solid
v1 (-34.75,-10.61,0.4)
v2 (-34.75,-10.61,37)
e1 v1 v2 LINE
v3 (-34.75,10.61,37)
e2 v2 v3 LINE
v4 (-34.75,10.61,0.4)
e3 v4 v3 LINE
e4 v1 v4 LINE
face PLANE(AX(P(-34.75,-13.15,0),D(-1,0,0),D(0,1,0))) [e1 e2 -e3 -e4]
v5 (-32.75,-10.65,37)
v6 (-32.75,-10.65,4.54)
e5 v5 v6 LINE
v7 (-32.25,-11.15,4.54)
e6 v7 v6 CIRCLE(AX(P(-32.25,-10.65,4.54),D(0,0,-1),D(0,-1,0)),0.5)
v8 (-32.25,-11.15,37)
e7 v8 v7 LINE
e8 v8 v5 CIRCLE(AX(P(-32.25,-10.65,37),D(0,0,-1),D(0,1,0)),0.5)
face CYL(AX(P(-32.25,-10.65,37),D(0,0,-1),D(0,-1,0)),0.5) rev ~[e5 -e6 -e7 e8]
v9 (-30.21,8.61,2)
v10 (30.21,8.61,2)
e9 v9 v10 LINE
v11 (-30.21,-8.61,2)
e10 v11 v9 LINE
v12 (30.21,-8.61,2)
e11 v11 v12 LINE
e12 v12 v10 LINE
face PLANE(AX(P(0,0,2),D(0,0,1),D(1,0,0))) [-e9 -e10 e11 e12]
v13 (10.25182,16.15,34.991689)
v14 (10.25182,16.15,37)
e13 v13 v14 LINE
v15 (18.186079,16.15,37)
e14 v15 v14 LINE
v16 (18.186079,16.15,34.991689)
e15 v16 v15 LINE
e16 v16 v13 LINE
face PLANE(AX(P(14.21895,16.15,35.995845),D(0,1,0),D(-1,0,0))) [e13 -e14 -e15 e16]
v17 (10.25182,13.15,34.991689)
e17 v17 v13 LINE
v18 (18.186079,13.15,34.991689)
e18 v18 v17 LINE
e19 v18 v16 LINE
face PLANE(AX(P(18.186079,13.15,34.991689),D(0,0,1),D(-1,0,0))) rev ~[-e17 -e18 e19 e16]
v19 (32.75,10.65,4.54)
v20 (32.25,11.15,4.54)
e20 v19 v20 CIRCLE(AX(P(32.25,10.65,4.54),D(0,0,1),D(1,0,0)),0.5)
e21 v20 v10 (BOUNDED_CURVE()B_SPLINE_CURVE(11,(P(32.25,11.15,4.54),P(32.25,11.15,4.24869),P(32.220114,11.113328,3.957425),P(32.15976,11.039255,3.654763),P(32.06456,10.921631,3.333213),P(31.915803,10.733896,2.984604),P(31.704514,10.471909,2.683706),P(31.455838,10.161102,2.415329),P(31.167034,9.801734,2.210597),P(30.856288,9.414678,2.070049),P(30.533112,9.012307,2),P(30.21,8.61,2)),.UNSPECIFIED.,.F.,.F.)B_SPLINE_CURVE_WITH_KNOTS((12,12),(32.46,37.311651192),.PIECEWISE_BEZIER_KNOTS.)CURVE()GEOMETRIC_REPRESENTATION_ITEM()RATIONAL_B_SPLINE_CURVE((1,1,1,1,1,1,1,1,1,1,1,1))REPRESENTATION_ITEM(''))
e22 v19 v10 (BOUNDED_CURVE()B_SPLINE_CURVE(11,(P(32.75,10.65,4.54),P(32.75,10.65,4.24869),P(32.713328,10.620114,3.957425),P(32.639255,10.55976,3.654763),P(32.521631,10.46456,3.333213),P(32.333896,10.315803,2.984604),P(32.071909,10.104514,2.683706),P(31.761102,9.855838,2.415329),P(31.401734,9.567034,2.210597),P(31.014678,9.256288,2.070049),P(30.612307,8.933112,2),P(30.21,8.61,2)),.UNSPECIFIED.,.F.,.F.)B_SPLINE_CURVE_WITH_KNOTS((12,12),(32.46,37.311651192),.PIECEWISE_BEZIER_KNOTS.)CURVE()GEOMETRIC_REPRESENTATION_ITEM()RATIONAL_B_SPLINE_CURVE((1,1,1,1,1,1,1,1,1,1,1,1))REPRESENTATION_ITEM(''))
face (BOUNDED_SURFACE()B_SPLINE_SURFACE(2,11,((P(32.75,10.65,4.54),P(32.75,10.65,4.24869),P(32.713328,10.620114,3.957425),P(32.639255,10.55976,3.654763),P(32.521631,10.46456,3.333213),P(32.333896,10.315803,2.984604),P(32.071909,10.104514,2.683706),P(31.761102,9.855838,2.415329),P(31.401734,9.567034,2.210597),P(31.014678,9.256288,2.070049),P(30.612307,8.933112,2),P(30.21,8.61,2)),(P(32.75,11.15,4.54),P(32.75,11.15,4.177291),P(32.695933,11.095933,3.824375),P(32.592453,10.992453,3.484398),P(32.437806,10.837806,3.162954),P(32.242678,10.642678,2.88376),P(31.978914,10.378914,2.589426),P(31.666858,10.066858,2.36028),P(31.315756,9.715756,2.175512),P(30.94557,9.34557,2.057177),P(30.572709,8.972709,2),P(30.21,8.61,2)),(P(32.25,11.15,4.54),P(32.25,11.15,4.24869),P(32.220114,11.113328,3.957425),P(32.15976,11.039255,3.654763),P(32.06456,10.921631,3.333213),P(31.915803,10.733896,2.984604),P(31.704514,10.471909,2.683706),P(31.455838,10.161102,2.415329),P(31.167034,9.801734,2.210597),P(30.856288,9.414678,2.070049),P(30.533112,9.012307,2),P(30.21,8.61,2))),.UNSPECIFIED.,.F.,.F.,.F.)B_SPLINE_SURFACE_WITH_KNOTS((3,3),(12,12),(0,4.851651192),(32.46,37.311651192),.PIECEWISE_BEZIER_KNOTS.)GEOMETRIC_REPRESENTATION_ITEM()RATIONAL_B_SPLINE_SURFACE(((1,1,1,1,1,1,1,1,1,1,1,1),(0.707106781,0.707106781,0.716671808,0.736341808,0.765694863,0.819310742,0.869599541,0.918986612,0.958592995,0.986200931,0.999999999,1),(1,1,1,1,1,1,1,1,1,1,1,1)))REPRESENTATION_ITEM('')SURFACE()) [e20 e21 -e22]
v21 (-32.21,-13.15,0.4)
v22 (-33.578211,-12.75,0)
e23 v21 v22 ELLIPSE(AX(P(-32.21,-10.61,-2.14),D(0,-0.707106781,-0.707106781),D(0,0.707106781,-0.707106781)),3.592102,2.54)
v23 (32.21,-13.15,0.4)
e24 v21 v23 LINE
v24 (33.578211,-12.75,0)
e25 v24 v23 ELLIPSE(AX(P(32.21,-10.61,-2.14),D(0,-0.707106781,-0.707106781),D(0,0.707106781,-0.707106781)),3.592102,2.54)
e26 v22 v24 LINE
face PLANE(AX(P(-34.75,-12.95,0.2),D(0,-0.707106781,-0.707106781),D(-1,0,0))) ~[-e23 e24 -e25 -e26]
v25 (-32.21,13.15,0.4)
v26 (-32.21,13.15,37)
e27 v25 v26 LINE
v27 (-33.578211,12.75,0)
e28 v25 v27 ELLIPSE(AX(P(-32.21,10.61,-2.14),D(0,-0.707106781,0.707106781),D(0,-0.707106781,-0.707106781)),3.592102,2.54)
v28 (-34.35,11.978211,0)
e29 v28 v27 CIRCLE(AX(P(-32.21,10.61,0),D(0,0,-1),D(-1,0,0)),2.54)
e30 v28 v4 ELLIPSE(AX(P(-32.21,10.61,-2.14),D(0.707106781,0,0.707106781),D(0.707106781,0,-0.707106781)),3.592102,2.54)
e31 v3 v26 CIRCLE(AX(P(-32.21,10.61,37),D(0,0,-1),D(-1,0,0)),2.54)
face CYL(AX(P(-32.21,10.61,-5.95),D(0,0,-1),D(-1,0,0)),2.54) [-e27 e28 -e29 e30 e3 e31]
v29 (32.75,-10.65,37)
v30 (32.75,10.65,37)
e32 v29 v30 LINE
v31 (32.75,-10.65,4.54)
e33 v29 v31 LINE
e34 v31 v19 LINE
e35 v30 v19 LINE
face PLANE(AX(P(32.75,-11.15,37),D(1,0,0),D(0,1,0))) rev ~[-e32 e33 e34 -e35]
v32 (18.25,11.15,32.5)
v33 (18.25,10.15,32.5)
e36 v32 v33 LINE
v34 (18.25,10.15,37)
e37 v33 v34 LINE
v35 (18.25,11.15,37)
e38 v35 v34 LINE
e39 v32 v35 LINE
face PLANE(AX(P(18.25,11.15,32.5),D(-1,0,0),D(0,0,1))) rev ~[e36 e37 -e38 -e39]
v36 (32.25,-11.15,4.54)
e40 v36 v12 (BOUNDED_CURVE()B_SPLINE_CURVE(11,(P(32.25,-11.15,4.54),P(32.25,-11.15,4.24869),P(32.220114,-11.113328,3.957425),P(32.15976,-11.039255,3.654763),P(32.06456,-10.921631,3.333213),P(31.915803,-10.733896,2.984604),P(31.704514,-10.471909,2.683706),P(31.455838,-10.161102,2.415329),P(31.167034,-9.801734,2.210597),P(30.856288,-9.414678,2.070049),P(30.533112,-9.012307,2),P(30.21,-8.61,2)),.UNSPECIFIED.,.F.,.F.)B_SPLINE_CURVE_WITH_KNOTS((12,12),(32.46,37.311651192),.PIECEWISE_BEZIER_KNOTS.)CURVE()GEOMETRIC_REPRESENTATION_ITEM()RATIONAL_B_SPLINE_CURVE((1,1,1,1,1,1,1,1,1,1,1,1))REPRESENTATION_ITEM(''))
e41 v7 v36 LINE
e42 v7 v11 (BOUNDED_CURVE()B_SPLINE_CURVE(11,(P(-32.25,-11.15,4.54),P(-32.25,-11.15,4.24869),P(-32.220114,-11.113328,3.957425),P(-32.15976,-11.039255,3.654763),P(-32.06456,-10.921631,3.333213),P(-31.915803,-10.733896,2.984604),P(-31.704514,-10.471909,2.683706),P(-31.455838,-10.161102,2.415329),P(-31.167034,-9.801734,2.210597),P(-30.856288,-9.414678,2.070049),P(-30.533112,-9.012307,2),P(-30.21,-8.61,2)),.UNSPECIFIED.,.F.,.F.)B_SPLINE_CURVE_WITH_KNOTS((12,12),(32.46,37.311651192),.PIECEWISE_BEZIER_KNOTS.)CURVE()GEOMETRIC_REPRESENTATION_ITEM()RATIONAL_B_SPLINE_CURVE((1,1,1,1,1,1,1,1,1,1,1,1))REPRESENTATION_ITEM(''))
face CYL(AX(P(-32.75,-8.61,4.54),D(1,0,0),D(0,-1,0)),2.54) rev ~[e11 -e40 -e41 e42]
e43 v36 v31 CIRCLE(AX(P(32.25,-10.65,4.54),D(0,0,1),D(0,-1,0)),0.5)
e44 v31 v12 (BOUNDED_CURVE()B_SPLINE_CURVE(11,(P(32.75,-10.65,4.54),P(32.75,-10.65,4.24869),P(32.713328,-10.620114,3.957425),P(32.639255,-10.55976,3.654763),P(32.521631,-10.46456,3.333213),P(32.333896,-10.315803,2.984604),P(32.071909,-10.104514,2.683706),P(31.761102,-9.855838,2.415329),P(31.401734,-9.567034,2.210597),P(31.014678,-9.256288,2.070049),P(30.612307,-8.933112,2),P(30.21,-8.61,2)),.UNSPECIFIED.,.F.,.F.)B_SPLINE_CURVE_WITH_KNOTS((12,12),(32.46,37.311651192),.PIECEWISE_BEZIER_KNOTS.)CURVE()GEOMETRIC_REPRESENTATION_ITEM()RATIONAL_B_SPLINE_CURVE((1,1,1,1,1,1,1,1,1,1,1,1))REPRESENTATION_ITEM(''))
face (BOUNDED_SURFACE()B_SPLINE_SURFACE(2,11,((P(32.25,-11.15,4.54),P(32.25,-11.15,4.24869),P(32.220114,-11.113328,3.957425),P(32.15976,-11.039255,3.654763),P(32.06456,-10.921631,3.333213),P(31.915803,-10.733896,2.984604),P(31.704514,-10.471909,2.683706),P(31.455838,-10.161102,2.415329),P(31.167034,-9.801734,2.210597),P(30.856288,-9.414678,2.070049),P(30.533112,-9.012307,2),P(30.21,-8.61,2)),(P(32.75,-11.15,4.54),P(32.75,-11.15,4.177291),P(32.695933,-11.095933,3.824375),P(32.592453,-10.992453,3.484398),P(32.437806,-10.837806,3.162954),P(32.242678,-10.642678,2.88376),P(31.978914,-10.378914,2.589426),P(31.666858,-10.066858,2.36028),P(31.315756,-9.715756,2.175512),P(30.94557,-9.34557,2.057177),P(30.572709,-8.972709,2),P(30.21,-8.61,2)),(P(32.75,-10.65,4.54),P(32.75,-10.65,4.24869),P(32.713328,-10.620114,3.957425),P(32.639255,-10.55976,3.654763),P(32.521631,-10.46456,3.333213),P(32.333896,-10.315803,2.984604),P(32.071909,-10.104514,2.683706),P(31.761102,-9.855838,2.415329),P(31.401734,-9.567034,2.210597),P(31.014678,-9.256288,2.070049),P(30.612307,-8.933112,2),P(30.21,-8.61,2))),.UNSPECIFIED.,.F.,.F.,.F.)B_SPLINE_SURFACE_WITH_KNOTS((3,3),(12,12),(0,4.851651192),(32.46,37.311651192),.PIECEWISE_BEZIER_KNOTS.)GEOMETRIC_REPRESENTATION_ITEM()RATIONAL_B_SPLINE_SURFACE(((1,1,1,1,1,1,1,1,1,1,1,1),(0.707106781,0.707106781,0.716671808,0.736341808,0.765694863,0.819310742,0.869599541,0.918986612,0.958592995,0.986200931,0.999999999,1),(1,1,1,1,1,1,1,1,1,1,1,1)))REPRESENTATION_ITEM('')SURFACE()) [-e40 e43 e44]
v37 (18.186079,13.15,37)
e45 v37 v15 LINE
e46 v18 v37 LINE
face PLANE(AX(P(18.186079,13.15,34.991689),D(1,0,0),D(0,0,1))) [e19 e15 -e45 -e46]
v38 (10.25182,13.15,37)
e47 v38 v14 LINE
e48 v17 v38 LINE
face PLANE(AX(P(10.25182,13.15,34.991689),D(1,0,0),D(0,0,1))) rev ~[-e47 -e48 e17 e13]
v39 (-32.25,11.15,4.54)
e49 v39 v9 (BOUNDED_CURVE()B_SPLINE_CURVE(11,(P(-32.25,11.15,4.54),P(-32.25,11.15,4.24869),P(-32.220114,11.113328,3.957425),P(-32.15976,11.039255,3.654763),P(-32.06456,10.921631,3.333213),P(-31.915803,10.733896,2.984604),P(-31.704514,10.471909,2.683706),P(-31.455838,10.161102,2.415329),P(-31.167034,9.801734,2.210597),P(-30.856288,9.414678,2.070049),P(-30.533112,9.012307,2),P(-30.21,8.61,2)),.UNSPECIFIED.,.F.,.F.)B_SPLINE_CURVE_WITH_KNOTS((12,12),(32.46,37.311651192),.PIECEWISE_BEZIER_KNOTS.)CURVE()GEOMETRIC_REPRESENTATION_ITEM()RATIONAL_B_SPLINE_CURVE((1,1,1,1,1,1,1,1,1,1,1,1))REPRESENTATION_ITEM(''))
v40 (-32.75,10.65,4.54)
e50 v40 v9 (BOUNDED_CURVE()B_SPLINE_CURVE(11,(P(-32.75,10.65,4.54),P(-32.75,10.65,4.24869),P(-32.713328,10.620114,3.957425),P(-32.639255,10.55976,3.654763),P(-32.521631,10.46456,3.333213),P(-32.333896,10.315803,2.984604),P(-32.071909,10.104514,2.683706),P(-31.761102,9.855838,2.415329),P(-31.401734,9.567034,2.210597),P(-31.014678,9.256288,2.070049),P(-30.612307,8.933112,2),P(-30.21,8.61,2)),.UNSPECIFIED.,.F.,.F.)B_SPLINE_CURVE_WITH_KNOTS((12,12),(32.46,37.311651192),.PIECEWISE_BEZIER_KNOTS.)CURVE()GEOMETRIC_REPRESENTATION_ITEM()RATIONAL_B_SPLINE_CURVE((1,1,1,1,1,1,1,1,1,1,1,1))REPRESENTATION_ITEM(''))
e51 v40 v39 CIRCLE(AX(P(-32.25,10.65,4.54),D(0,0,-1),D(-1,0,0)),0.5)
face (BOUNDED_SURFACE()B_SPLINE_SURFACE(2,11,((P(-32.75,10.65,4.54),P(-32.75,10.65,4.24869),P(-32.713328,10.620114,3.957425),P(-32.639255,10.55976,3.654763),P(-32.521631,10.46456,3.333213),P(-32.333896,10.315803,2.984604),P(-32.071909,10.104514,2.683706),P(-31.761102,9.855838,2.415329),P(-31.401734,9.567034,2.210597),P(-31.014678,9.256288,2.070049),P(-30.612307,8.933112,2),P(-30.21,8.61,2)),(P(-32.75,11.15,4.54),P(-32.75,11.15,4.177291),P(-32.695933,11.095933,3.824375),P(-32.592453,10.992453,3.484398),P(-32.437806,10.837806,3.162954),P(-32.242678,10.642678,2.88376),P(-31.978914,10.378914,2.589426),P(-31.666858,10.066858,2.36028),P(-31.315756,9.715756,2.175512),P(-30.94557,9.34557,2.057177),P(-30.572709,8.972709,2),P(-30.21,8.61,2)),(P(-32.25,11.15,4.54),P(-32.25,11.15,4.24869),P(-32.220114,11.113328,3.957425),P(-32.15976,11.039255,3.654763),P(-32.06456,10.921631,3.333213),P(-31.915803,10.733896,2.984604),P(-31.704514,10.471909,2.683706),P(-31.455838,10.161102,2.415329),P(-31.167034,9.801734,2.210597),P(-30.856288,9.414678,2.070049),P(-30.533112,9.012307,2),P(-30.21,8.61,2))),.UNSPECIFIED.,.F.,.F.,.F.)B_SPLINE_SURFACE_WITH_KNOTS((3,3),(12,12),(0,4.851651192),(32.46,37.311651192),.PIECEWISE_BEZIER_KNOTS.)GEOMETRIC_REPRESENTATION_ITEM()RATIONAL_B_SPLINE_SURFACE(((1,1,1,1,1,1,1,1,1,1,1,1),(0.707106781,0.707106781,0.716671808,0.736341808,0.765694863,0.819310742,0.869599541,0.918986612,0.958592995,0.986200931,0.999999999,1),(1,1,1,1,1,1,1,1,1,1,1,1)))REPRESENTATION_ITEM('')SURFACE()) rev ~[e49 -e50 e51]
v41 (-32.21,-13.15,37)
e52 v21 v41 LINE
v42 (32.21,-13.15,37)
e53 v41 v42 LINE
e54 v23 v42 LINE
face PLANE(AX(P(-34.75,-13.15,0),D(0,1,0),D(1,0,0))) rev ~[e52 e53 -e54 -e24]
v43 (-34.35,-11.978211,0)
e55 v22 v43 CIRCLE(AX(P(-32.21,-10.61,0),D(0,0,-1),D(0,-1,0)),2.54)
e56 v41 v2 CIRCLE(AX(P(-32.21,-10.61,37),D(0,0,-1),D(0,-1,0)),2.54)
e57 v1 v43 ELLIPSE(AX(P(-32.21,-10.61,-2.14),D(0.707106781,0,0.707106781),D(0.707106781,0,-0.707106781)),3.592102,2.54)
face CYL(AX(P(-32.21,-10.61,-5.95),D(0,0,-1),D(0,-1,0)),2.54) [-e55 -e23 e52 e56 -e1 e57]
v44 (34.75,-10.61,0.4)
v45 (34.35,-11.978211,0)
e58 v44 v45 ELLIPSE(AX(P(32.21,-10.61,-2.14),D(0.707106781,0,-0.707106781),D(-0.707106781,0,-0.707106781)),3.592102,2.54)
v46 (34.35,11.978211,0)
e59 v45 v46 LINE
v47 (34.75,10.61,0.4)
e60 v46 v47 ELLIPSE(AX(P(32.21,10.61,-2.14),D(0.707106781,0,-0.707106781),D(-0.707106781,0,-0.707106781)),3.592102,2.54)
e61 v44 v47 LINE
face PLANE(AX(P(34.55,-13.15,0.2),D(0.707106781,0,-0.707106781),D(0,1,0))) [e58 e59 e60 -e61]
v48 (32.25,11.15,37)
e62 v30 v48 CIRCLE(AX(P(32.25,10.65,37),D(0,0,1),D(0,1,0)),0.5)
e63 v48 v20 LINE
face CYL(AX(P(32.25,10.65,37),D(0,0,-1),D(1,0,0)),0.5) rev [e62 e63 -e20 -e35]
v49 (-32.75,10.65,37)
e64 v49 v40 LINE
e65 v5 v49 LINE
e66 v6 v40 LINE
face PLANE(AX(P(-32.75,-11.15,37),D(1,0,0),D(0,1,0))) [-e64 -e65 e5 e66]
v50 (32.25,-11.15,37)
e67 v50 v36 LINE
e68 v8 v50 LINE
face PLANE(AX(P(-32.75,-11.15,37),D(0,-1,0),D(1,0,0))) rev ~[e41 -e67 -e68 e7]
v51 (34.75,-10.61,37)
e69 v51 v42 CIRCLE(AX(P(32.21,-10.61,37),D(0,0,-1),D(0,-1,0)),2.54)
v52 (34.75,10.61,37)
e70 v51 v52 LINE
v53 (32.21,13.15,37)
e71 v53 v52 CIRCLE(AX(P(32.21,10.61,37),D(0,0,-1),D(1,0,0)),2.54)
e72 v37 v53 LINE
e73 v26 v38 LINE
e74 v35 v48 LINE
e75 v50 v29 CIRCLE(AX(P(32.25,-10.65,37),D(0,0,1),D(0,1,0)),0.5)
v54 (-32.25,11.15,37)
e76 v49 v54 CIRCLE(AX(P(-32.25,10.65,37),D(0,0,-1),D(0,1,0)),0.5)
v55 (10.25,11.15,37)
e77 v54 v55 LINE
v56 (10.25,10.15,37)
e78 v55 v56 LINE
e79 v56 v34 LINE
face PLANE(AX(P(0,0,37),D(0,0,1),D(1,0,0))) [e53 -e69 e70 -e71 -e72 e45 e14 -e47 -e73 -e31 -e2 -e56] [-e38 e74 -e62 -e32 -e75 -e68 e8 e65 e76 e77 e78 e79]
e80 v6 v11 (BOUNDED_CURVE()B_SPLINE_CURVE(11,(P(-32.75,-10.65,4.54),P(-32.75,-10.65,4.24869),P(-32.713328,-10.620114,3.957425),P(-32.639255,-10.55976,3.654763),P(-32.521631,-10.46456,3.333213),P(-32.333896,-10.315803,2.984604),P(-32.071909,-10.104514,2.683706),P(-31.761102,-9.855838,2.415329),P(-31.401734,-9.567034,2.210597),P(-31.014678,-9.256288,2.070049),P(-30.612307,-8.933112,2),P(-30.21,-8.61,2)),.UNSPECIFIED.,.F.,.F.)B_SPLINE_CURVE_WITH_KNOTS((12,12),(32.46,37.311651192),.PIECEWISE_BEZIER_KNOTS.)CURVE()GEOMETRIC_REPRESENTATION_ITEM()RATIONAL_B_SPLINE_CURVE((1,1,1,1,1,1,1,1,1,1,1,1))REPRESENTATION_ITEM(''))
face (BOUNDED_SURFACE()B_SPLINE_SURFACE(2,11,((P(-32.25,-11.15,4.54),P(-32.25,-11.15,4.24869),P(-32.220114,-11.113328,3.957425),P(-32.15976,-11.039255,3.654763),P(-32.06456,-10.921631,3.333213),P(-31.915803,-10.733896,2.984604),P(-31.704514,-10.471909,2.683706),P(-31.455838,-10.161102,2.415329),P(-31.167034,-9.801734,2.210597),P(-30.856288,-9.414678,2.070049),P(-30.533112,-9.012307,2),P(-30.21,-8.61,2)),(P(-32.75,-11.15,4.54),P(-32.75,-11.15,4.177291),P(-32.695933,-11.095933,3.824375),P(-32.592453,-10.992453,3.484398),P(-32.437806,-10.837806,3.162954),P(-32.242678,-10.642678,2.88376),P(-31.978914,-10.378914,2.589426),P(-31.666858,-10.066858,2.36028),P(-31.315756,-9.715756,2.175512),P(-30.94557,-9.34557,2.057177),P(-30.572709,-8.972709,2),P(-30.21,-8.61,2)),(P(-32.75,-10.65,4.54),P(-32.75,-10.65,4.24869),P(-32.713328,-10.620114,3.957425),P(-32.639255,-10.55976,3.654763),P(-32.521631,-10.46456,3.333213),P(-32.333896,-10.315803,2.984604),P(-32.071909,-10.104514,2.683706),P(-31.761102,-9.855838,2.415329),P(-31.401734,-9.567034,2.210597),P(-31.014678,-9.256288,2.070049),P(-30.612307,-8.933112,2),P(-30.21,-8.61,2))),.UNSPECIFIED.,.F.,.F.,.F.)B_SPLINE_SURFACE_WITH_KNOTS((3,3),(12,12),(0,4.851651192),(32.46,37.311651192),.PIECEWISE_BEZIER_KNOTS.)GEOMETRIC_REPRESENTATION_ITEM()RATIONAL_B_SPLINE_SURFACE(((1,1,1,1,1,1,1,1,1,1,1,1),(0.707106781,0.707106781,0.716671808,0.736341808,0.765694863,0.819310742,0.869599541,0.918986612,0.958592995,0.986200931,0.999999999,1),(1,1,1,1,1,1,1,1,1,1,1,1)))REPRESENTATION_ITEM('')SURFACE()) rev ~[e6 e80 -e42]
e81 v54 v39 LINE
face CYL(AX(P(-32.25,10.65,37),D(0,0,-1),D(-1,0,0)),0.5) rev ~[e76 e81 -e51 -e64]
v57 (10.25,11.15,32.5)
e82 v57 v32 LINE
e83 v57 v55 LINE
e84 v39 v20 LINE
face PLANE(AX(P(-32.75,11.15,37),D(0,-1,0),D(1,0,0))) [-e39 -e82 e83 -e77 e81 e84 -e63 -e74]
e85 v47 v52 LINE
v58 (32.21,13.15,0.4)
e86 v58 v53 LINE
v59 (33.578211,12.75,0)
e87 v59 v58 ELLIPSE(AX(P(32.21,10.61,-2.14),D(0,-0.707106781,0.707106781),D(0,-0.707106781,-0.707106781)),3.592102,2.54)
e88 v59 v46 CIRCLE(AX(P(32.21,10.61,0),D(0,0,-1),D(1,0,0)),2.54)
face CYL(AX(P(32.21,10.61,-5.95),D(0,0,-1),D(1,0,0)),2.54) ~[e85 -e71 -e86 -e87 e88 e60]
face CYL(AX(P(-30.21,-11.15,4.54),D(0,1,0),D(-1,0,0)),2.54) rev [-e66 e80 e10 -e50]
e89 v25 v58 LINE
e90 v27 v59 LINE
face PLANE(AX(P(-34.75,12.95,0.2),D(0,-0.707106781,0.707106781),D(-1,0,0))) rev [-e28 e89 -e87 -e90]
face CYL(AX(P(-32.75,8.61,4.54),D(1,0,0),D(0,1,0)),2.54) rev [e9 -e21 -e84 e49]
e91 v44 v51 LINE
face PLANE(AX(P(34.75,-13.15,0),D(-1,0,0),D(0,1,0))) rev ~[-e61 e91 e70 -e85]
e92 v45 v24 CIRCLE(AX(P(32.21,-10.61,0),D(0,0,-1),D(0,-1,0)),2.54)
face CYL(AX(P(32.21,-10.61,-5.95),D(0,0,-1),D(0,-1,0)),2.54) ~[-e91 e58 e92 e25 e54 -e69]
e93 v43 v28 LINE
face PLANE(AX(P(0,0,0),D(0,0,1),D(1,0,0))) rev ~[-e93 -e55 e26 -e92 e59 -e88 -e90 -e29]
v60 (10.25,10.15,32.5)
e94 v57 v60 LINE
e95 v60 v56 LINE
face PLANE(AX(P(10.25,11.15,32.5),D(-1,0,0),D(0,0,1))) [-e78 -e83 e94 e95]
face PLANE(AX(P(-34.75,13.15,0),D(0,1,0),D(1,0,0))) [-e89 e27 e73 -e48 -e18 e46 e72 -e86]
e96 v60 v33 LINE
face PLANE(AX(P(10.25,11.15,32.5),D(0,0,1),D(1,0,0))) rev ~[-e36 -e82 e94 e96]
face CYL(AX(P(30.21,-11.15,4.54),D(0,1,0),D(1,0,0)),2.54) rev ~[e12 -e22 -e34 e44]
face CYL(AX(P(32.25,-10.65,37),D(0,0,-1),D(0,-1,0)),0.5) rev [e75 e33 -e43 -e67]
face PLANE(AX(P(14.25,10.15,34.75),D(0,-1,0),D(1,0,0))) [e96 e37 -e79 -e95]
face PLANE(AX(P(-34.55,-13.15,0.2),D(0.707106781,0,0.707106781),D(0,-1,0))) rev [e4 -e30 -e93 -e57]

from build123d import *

# Parameters (mm, degrees)
F0_W        = 69.5
F0_H        = 26.3
F1_DEPTH    = 37
F2_W        = 65.5
F2_H        = 22.3
F3_DEPTH    = 35
F4_SIZE     = 0.4
F5_T1_DEPTH = 49.3
F6_R        = 2.54
F7_W        = 8
F7_H        = 4.5
F8_DEPTH    = 1
F9_W        = 7.9342592508
F9_H        = 2.0083109736
F10_DEPTH   = 3
F11_R       = 0.5


# Not quite as in the source:
# - a fillet or chamfer that OpenCascade refuses, or shapes differently, is made with other operations: its cross-section is extruded or revolved along the edge and cut away or added


with BuildPart() as f1:
    # F0 (on Top) → F1 (new body)
    with BuildSketch(Plane.XY):
        Rectangle(F0_W, F0_H)
    extrude(amount=F1_DEPTH)

    # F2 (on face) → F3 (cut)
    with BuildSketch(Plane.XY.offset(37)):
        Rectangle(F2_W, F2_H)
    extrude(amount=-F3_DEPTH, mode=Mode.SUBTRACT)

    # F4
    f4_edges = [f1.edges().sort_by_distance(p)[0] for p in [
        (0, -13.15, 0),
        (34.75, 0, 0),
        (0, 13.15, 0),
        (-34.75, 0, 0),
    ]]
    chamfer(f4_edges, length=F4_SIZE)

    # F5: fillet of radius 2.54 on 4 edges, made by hand

    # F5_s2 → F5_t1 (cut)
    with BuildSketch(Plane.XY.offset(-5.95)):
        with BuildLine():
            ThreePointArc((34.75, 10.61), (34.0060512242, 12.4060512242), (32.21, 13.15))
            Line((32.21, 13.15), (34.75, 13.15))
            Line((34.75, 13.15), (34.75, 10.61))
        make_face()
        with BuildLine():
            ThreePointArc((32.21, -13.15), (34.0060512242, -12.4060512242), (34.75, -10.61))
            Line((34.75, -10.61), (34.75, -13.15))
            Line((34.75, -13.15), (32.21, -13.15))
        make_face()
        with BuildLine():
            ThreePointArc((-34.75, 10.61), (-34.0060512242, 12.4060512242), (-32.21, 13.15))
            Line((-32.21, 13.15), (-34.75, 13.15))
            Line((-34.75, 13.15), (-34.75, 10.61))
        make_face()
        with BuildLine():
            ThreePointArc((-32.21, -13.15), (-34.0060512242, -12.4060512242), (-34.75, -10.61))
            Line((-34.75, -10.61), (-34.75, -13.15))
            Line((-34.75, -13.15), (-32.21, -13.15))
        make_face()
    extrude(amount=F5_T1_DEPTH, mode=Mode.SUBTRACT)

    # F6
    f6_edges = [f1.edges().sort_by_distance(p)[0] for p in [
        (0, -11.15, 2),
        (-32.75, 0, 2),
        (32.75, 0, 2),
        (0, 11.15, 2),
    ]]
    fillet(f6_edges, radius=F6_R)

    # F7 (on face) → F8 (join)
    with BuildSketch(Plane.XZ.offset(-11.15)):
        with Locations((14.25, 34.75)):
            Rectangle(F7_W, F7_H)
    extrude(amount=F8_DEPTH)

    # F9 (on face) → F10 (join)
    with BuildSketch(Plane(origin=(0, 13.15, 0), x_dir=(-1, 0, 0), z_dir=(0, 1, 0))):
        with Locations((-14.2189497128, 35.9958445132)):
            Rectangle(F9_W, F9_H)
    extrude(amount=F10_DEPTH)

    # F11
    f11_edges = [f1.edges().sort_by_distance(p)[0] for p in [
        (32.75, 11.15, 20.77),
        (32.75, -11.15, 20.77),
        (-32.75, -11.15, 20.77),
        (-32.75, 11.15, 20.77),
    ]]
    fillet(f11_edges, radius=F11_R)


solid = f1.part
